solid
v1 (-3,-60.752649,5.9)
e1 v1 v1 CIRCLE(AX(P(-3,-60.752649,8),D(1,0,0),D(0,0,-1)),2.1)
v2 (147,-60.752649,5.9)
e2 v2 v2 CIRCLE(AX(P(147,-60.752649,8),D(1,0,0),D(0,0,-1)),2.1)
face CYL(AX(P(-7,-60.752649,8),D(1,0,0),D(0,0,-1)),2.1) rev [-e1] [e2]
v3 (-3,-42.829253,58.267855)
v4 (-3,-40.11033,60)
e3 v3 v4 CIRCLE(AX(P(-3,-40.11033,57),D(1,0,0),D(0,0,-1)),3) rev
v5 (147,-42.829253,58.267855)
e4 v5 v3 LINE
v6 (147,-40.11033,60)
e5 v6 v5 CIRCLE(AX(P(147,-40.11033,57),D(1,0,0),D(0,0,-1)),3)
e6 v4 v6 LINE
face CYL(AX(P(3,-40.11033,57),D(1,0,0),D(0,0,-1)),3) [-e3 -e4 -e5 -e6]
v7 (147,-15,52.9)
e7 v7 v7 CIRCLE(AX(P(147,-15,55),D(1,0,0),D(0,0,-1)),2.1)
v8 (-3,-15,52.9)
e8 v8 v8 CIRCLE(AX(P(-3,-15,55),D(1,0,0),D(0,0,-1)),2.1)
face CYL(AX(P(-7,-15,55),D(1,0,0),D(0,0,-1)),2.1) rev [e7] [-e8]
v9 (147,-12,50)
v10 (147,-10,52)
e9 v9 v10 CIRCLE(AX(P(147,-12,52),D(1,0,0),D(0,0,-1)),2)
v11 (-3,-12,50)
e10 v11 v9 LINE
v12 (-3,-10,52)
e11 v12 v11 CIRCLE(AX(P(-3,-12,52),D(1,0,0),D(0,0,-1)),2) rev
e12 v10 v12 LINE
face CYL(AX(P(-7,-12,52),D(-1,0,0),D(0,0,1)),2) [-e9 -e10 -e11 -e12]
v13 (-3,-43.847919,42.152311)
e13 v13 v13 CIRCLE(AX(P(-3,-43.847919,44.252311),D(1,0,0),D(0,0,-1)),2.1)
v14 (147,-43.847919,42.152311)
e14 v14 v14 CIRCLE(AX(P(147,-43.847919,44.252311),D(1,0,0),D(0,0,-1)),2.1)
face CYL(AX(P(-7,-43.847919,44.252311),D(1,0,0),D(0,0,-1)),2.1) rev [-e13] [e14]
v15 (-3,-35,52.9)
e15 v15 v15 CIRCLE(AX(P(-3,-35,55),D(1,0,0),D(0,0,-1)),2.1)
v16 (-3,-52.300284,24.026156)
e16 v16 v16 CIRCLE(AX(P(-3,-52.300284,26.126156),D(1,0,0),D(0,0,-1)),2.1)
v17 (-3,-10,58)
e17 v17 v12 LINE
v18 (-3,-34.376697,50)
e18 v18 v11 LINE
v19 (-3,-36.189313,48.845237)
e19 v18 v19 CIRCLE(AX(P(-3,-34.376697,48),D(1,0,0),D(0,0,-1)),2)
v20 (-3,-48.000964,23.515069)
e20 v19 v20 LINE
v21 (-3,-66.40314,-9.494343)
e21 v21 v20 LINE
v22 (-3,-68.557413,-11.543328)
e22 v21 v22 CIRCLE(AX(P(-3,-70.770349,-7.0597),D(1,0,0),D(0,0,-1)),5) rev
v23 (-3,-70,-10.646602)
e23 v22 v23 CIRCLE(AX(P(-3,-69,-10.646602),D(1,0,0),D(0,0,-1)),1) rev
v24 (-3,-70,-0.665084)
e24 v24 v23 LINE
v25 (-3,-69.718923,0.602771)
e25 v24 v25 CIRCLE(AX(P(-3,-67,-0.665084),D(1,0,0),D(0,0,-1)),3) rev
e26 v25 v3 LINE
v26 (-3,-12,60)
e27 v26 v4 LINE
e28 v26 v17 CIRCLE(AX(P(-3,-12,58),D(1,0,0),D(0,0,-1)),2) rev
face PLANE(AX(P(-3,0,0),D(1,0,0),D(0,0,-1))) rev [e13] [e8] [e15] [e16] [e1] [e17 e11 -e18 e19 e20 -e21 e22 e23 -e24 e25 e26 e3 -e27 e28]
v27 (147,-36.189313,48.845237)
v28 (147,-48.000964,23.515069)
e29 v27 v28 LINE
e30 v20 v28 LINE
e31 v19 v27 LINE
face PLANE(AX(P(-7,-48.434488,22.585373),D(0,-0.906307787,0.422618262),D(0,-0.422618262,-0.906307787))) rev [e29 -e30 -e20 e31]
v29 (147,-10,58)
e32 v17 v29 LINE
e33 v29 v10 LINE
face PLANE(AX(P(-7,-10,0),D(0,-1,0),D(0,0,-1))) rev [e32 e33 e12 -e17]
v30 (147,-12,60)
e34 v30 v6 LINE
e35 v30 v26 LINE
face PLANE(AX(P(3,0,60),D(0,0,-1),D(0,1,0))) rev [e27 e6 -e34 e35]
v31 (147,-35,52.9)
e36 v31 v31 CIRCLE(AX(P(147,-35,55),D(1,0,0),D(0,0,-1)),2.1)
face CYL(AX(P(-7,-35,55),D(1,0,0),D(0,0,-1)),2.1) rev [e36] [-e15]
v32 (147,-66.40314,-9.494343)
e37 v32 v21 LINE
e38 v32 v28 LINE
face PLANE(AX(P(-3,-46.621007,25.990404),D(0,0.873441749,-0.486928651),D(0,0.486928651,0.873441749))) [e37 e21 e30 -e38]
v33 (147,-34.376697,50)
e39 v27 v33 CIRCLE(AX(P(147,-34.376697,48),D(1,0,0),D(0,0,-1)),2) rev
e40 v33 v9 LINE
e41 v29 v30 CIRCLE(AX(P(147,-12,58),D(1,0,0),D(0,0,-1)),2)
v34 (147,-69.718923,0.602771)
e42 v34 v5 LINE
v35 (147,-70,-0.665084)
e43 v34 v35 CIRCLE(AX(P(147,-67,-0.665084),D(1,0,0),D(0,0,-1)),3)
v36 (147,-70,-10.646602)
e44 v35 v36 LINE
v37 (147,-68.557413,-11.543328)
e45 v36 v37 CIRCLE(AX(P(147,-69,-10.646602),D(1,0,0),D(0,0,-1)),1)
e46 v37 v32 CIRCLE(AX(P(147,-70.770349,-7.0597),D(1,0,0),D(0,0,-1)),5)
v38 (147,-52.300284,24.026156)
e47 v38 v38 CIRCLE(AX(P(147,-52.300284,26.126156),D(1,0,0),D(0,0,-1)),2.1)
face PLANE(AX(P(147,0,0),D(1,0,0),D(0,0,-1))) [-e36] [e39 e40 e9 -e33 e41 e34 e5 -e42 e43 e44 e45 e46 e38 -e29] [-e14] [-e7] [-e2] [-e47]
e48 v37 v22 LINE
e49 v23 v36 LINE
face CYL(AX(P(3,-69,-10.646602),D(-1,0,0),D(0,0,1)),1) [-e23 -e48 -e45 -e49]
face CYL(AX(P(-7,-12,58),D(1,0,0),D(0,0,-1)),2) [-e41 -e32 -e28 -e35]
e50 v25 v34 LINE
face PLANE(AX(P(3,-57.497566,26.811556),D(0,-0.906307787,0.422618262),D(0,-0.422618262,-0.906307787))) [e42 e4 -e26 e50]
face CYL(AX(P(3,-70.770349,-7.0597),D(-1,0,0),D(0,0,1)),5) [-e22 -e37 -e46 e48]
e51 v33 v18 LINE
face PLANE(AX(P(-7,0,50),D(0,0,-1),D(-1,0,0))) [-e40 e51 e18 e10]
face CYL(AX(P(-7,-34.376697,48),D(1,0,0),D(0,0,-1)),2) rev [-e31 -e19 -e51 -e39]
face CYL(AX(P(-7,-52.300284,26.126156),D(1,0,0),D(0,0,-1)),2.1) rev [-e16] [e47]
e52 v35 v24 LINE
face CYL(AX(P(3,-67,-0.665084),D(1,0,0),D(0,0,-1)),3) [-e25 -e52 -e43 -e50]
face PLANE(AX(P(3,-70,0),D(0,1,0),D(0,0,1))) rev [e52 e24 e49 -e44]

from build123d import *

# Parameters (mm, degrees)
SKETCH_1_R               = 2.1
SKETCH_1_W               = 40.5
SKETCH_1_H               = 20.5
SKETCH_1_R_2             = 6
EXTRUDE_1_DEPTH          = 3
SKETCH_2_R               = 3
SKETCH_2_R_2             = 2.1
CUT_EXTRUDE_1_DEPTH      = 10
SKETCH_3_R               = 1.5
CUT_EXTRUDE_2_DEPTH      = 10
SKETCH_4_R               = 2.1
CUT_EXTRUDE_3_DEPTH      = 10
CHAMFER_1_SIZE           = 10
FILLET_1_R               = 3
FILLET_2_R               = 2
SKETCH_5_R               = 2.1
CUT_EXTRUDE_4_DEPTH      = 10
CUT_EXTRUDE_5_DEPTH      = 10
MOVE_START               = 3
MOVE_FACE_1_OUTLINE_R    = 2.1
MOVE_FACE_1_DEPTH        = 144
FILLET_3_R               = 2
DELETE_START             = -3
DELETE_FACE_1_DEPTH      = 150
DELETE_FACE_2_OUTLINE_R  = 2.1
DELETE_FACE_2_DEPTH      = 150
CUT_EXTRUDE_6_DEPTH      = 177.068168617
CUT_EXTRUDE_6_DEPTH_BACK = 177.068168617
FILLET_4_R               = 5
FILLET_5_R               = 1


# Read off the part's stored shape, not the designer's step: 移动面1, 删除面1, 删除面2
with BuildPart() as part:
    # 草图1 → 凸台-拉伸1 (new, symmetric)
    with BuildSketch(Plane(origin=(0, 0, 0), x_dir=(0, 0, -1), z_dir=(1, 0, 0))):
        with BuildLine():
            Line((-60, -42.021540511), (0, -70))
            Line((0, -70), (12, -70))
            Line((12, -70), (12, 30))
            Line((12, 30), (-75.715728753, 30))
            Line((-75.715728753, 30), (-125.857864376, 80.142135624))
            ThreePointArc((-125.857864376, 80.142135624), (-154.142135624, 80.142135624), (-154.142135624, 51.857864376))
            Line((-154.142135624, 51.857864376), (-92.284271247, -10))
            Line((-92.284271247, -10), (-60, -10))
            Line((-60, -10), (-60, -42.021540511))
        make_face()
        with Locations((-73.77114317, 0.625)):
            Circle(SKETCH_1_R, mode=Mode.SUBTRACT)
        with Locations((-49.02114317, 5.625)):
            Rectangle(SKETCH_1_W, SKETCH_1_H, mode=Mode.SUBTRACT)
        with Locations((-24.27114317, 0.625)):
            Circle(SKETCH_1_R, mode=Mode.SUBTRACT)
        Circle(SKETCH_1_R_2, mode=Mode.SUBTRACT)
        with Locations((-73.77114317, 10.625)):
            Circle(SKETCH_1_R, mode=Mode.SUBTRACT)
        with Locations((-24.27114317, 10.625)):
            Circle(SKETCH_1_R, mode=Mode.SUBTRACT)
    extrude(amount=EXTRUDE_1_DEPTH, both=True)

    # 草图2 → 切除-拉伸1 (cut)
    with BuildSketch(Plane(origin=(3, 0, 0), x_dir=(0, 0, -1), z_dir=(1, 0, 0))):
        with Locations((-140, 66)):
            Circle(SKETCH_2_R)
        with Locations((-140, 82)):
            Circle(SKETCH_2_R_2)
        with Locations((-126.143593539, 74)):
            Circle(SKETCH_2_R_2)
        with Locations((-126.143593539, 58)):
            Circle(SKETCH_2_R_2)
        with Locations((-140, 50)):
            Circle(SKETCH_2_R_2)
        with Locations((-153.856406461, 58)):
            Circle(SKETCH_2_R_2)
        with Locations((-153.856406461, 74)):
            Circle(SKETCH_2_R_2)
    extrude(amount=-CUT_EXTRUDE_1_DEPTH, mode=Mode.SUBTRACT)

    # 草图3 → 切除-拉伸2 (cut)
    with BuildSketch(Plane(origin=(3, 0, 0), x_dir=(0, 0, -1), z_dir=(1, 0, 0))):
        with Locations((-69.27114317, 15.875)):
            Circle(SKETCH_3_R)
        with Locations((-28.77114317, 15.875)):
            Circle(SKETCH_3_R)
        with Locations((-69.27114317, -4.625)):
            Circle(SKETCH_3_R)
        with Locations((-28.77114317, -4.625)):
            Circle(SKETCH_3_R)
    extrude(amount=-CUT_EXTRUDE_2_DEPTH, mode=Mode.SUBTRACT)

    # 草图4 → 切除-拉伸3 (cut)
    with BuildSketch(Plane(origin=(3, 0, 0), x_dir=(0, 0, -1), z_dir=(1, 0, 0))):
        with Locations((-55, -15)):
            Circle(SKETCH_4_R)
        with Locations((-55, -35)):
            Circle(SKETCH_4_R)
        with Locations((7, -65)):
            Circle(SKETCH_4_R)
        with Locations((7, -45)):
            Circle(SKETCH_4_R)
        with Locations((-8, -60.75264914)):
            Circle(SKETCH_4_R)
        with Locations((-26.126155741, -52.300283905)):
            Circle(SKETCH_4_R)
        with Locations((-44.252311481, -43.84791867)):
            Circle(SKETCH_4_R)
    extrude(amount=-CUT_EXTRUDE_3_DEPTH, mode=Mode.SUBTRACT)

    # 倒角1
    chamfer_1_edges = [part.edges().sort_by_distance(p)[0] for p in [
        (0, -10, 60),
    ]]
    chamfer(chamfer_1_edges, length=CHAMFER_1_SIZE)

    # 圆角1
    fillet_1_edges = [part.edges().sort_by_distance(p)[0] for p in [
        (0, -20, 60),
        (0, -10, 70),
        (0, 30, -12),
        (0, -70, -12),
        (0, -70, 0),
        (0, -42.021540511, 60),
        (0, -10, 92.284271247),
        (0, 30, 75.715728753),
    ]]
    fillet(fillet_1_edges, radius=FILLET_1_R)

    # 圆角2
    fillet_2_edges = [part.edges().sort_by_distance(p)[0] for p in [
        (0, 15.875, 30.27114317),
        (0, 14.375, 28.77114317),
        (0, -4.625, 67.77114317),
        (0, -3.125, 69.27114317),
        (0, -4.625, 30.27114317),
        (0, -3.125, 28.77114317),
        (0, 14.375, 69.27114317),
        (0, 15.875, 67.77114317),
    ]]
    fillet(fillet_2_edges, radius=FILLET_2_R)

    # 草图5 → 切除-拉伸4 (cut)
    with BuildSketch(Plane(origin=(3, 0, 0), x_dir=(0, 0, -1), z_dir=(1, 0, 0))):
        with Locations((-110, 57.213203436)):
            Circle(SKETCH_5_R)
        with Locations((-88.786796564, 36)):
            Circle(SKETCH_5_R)
        with Locations((-109.946763354, 14.785654888)):
            Circle(SKETCH_5_R)
        with Locations((-131.214342006, 35.94434337)):
            Circle(SKETCH_5_R)
        with Locations((-62.230447378, 25)):
            Circle(SKETCH_5_R)
        with Locations((-32.230447378, 25)):
            Circle(SKETCH_5_R)
    extrude(amount=-CUT_EXTRUDE_4_DEPTH, mode=Mode.SUBTRACT)

    # 草图6 → 切除-拉伸5 (cut)
    with BuildSketch(Plane(origin=(3, 0, 0), x_dir=(0, 0, -1), z_dir=(1, 0, 0))):
        with BuildLine():
            ThreePointArc((-60.878679656, -19.121320344), (-60.228361402, -20.09459039), (-60, -21.242640687))
            Line((-60, -21.242640687), (-60, -10))
            Line((-60, -10), (-50, -10))
            Line((-50, -10), (-50, -21.242640687))
            Line((-50, -21.242640687), (-50, -35.650837903))
            Line((-50, -35.650837903), (2.216946626, -60))
            Line((2.216946626, -60), (9, -60))
            Line((9, -60), (12, -60))
            Line((12, -60), (12, 27))
            ThreePointArc((12, 27), (11.121320344, 29.121320344), (9, 30))
            Line((9, 30), (-74.473088065, 30))
            ThreePointArc((-74.473088065, 30), (-75.621138363, 30.228361402), (-76.594408409, 30.878679656))
            Line((-76.594408409, 30.878679656), (-125.857864376, 80.142135624))
            ThreePointArc((-125.857864376, 80.142135624), (-154.142135624, 80.142135624), (-154.142135624, 51.857864376))
            Line((-154.142135624, 51.857864376), (-93.162950904, -9.121320344))
            ThreePointArc((-93.162950904, -9.121320344), (-92.189680857, -9.771638598), (-91.04163056, -10))
            Line((-91.04163056, -10), (-71.242640687, -10))
            ThreePointArc((-71.242640687, -10), (-70.09459039, -10.228361402), (-69.121320344, -10.878679656))
            Line((-69.121320344, -10.878679656), (-60.878679656, -19.121320344))
        make_face()
    extrude(amount=-CUT_EXTRUDE_5_DEPTH, mode=Mode.SUBTRACT)

    # Move Face 1 outline → Move Face 1 (add)
    with BuildSketch(Plane.YZ.offset(MOVE_START)):
        with BuildLine():
            Line((-10, 60), (-40.110329728, 60))
            ThreePointArc((-40.110329728, 60), (-41.722228553, 59.530174337), (-42.829253089, 58.267854785))
            Line((-42.829253089, 58.267854785), (-69.718923361, 0.602770797))
            ThreePointArc((-69.718923361, 0.602770797), (-69.928888021, -0.015765146), (-70, -0.665083988))
            Line((-70, -0.665083988), (-70, -9))
            ThreePointArc((-70, -9), (-69.121320344, -11.121320344), (-67, -12))
            Line((-67, -12), (-60, -12))
            Line((-60, -12), (-60, -2.216946626))
            Line((-60, -2.216946626), (-35.650837903, 50))
            Line((-35.650837903, 50), (-10, 50))
            Line((-10, 50), (-10, 60))
        make_face()
        with Locations((-65, -7)):
            Circle(MOVE_FACE_1_OUTLINE_R, mode=Mode.SUBTRACT)
        with Locations((-60.75264914, 8)):
            Circle(MOVE_FACE_1_OUTLINE_R, mode=Mode.SUBTRACT)
        with Locations((-52.300283905, 26.126155741)):
            Circle(MOVE_FACE_1_OUTLINE_R, mode=Mode.SUBTRACT)
        with Locations((-43.84791867, 44.252311481)):
            Circle(MOVE_FACE_1_OUTLINE_R, mode=Mode.SUBTRACT)
        with Locations((-35, 55)):
            Circle(MOVE_FACE_1_OUTLINE_R, mode=Mode.SUBTRACT)
        with Locations((-15, 55)):
            Circle(MOVE_FACE_1_OUTLINE_R, mode=Mode.SUBTRACT)
    extrude(amount=MOVE_FACE_1_DEPTH)

    # 圆角3
    fillet_3_edges = [part.edges().sort_by_distance(p)[0] for p in [
        (72, -60, -12),
        (75, -60, -2.216946626),
        (75, -35.650837903, 50),
        (72, -10, 50),
        (72, -10, 60),
    ]]
    fillet(fillet_3_edges, radius=FILLET_3_R)

    # Delete Face 1 outline → Delete Face 1 (add)
    with BuildSketch(Plane.YZ.offset(DELETE_START)):
        with BuildLine():
            ThreePointArc((-60, -10), (-60.585786438, -11.414213562), (-62, -12))
            Line((-62, -12), (-60, -12))
            Line((-60, -12), (-60, -10))
        make_face()
        with BuildLine():
            Line((-70, -9), (-70, -12))
            Line((-70, -12), (-67, -12))
            ThreePointArc((-67, -12), (-69.121320344, -11.121320344), (-70, -9))
        make_face()
    extrude(amount=DELETE_FACE_1_DEPTH)

    # Delete Face 2 outline → Delete Face 2 (add)
    with BuildSketch(Plane.YZ.offset(DELETE_START)):
        with Locations((-65, -7)):
            Circle(DELETE_FACE_2_OUTLINE_R)
    extrude(amount=DELETE_FACE_2_DEPTH)

    # 草图8 → 切除-拉伸6 (cut, two sides: drawn at the far end of the back side and taken through both)
    with BuildSketch(Plane(origin=(147, 0, 0), x_dir=(0, 0, -1), z_dir=(1, 0, 0)).offset(-CUT_EXTRUDE_6_DEPTH_BACK)):
        with BuildLine():
            Line((-23.515068548, -48.000964265), (12, -67.8))
            Line((12, -67.8), (12, -60))
            Line((12, -60), (2.660335952, -60))
            ThreePointArc((2.660335952, -60), (2.227456724, -59.952592014), (1.815099428, -59.812615574))
            Line((1.815099428, -59.812615574), (-23.515068548, -48.000964265))
        make_face()
    extrude(amount=CUT_EXTRUDE_6_DEPTH + CUT_EXTRUDE_6_DEPTH_BACK, mode=Mode.SUBTRACT)

    # 圆角4
    # the kernel refuses this fillet: 5 mm, written as the material it takes off along each edge
    with BuildSketch(Plane(origin=(-10.171790934, -67.8, -12), x_dir=(0, 0.4869286506241587, 0.8734417491746865), z_dir=(1, 0, 0))) as fillet_4_piece_1:
        with BuildLine():
            CenterArc((2.868716374, 5), FILLET_4_R, 218.001756319, 51.998243681)
            Line((-1.071243031, 1.921571848), (-1.150042219, 1.860003285))
            ThreePointArc((-1.150042219, 1.860003285), (-0.622965691, 0.912093059), (-0.087344175, -0.048692865))
            Line((-0.087344175, -0.048692865), (0, -0.1))
            Line((0, -0.1), (2.868716374, -0.1))
            Line((2.868716374, -0.1), (2.868716374, 0))
        make_face()
    extrude(amount=164.343581869, mode=Mode.SUBTRACT)

    # 圆角5
    fillet_5_edges = [part.edges().sort_by_distance(p)[0] for p in [
        (72, -70, -12),
    ]]
    fillet(fillet_5_edges, radius=FILLET_5_R)


solid = part.part
